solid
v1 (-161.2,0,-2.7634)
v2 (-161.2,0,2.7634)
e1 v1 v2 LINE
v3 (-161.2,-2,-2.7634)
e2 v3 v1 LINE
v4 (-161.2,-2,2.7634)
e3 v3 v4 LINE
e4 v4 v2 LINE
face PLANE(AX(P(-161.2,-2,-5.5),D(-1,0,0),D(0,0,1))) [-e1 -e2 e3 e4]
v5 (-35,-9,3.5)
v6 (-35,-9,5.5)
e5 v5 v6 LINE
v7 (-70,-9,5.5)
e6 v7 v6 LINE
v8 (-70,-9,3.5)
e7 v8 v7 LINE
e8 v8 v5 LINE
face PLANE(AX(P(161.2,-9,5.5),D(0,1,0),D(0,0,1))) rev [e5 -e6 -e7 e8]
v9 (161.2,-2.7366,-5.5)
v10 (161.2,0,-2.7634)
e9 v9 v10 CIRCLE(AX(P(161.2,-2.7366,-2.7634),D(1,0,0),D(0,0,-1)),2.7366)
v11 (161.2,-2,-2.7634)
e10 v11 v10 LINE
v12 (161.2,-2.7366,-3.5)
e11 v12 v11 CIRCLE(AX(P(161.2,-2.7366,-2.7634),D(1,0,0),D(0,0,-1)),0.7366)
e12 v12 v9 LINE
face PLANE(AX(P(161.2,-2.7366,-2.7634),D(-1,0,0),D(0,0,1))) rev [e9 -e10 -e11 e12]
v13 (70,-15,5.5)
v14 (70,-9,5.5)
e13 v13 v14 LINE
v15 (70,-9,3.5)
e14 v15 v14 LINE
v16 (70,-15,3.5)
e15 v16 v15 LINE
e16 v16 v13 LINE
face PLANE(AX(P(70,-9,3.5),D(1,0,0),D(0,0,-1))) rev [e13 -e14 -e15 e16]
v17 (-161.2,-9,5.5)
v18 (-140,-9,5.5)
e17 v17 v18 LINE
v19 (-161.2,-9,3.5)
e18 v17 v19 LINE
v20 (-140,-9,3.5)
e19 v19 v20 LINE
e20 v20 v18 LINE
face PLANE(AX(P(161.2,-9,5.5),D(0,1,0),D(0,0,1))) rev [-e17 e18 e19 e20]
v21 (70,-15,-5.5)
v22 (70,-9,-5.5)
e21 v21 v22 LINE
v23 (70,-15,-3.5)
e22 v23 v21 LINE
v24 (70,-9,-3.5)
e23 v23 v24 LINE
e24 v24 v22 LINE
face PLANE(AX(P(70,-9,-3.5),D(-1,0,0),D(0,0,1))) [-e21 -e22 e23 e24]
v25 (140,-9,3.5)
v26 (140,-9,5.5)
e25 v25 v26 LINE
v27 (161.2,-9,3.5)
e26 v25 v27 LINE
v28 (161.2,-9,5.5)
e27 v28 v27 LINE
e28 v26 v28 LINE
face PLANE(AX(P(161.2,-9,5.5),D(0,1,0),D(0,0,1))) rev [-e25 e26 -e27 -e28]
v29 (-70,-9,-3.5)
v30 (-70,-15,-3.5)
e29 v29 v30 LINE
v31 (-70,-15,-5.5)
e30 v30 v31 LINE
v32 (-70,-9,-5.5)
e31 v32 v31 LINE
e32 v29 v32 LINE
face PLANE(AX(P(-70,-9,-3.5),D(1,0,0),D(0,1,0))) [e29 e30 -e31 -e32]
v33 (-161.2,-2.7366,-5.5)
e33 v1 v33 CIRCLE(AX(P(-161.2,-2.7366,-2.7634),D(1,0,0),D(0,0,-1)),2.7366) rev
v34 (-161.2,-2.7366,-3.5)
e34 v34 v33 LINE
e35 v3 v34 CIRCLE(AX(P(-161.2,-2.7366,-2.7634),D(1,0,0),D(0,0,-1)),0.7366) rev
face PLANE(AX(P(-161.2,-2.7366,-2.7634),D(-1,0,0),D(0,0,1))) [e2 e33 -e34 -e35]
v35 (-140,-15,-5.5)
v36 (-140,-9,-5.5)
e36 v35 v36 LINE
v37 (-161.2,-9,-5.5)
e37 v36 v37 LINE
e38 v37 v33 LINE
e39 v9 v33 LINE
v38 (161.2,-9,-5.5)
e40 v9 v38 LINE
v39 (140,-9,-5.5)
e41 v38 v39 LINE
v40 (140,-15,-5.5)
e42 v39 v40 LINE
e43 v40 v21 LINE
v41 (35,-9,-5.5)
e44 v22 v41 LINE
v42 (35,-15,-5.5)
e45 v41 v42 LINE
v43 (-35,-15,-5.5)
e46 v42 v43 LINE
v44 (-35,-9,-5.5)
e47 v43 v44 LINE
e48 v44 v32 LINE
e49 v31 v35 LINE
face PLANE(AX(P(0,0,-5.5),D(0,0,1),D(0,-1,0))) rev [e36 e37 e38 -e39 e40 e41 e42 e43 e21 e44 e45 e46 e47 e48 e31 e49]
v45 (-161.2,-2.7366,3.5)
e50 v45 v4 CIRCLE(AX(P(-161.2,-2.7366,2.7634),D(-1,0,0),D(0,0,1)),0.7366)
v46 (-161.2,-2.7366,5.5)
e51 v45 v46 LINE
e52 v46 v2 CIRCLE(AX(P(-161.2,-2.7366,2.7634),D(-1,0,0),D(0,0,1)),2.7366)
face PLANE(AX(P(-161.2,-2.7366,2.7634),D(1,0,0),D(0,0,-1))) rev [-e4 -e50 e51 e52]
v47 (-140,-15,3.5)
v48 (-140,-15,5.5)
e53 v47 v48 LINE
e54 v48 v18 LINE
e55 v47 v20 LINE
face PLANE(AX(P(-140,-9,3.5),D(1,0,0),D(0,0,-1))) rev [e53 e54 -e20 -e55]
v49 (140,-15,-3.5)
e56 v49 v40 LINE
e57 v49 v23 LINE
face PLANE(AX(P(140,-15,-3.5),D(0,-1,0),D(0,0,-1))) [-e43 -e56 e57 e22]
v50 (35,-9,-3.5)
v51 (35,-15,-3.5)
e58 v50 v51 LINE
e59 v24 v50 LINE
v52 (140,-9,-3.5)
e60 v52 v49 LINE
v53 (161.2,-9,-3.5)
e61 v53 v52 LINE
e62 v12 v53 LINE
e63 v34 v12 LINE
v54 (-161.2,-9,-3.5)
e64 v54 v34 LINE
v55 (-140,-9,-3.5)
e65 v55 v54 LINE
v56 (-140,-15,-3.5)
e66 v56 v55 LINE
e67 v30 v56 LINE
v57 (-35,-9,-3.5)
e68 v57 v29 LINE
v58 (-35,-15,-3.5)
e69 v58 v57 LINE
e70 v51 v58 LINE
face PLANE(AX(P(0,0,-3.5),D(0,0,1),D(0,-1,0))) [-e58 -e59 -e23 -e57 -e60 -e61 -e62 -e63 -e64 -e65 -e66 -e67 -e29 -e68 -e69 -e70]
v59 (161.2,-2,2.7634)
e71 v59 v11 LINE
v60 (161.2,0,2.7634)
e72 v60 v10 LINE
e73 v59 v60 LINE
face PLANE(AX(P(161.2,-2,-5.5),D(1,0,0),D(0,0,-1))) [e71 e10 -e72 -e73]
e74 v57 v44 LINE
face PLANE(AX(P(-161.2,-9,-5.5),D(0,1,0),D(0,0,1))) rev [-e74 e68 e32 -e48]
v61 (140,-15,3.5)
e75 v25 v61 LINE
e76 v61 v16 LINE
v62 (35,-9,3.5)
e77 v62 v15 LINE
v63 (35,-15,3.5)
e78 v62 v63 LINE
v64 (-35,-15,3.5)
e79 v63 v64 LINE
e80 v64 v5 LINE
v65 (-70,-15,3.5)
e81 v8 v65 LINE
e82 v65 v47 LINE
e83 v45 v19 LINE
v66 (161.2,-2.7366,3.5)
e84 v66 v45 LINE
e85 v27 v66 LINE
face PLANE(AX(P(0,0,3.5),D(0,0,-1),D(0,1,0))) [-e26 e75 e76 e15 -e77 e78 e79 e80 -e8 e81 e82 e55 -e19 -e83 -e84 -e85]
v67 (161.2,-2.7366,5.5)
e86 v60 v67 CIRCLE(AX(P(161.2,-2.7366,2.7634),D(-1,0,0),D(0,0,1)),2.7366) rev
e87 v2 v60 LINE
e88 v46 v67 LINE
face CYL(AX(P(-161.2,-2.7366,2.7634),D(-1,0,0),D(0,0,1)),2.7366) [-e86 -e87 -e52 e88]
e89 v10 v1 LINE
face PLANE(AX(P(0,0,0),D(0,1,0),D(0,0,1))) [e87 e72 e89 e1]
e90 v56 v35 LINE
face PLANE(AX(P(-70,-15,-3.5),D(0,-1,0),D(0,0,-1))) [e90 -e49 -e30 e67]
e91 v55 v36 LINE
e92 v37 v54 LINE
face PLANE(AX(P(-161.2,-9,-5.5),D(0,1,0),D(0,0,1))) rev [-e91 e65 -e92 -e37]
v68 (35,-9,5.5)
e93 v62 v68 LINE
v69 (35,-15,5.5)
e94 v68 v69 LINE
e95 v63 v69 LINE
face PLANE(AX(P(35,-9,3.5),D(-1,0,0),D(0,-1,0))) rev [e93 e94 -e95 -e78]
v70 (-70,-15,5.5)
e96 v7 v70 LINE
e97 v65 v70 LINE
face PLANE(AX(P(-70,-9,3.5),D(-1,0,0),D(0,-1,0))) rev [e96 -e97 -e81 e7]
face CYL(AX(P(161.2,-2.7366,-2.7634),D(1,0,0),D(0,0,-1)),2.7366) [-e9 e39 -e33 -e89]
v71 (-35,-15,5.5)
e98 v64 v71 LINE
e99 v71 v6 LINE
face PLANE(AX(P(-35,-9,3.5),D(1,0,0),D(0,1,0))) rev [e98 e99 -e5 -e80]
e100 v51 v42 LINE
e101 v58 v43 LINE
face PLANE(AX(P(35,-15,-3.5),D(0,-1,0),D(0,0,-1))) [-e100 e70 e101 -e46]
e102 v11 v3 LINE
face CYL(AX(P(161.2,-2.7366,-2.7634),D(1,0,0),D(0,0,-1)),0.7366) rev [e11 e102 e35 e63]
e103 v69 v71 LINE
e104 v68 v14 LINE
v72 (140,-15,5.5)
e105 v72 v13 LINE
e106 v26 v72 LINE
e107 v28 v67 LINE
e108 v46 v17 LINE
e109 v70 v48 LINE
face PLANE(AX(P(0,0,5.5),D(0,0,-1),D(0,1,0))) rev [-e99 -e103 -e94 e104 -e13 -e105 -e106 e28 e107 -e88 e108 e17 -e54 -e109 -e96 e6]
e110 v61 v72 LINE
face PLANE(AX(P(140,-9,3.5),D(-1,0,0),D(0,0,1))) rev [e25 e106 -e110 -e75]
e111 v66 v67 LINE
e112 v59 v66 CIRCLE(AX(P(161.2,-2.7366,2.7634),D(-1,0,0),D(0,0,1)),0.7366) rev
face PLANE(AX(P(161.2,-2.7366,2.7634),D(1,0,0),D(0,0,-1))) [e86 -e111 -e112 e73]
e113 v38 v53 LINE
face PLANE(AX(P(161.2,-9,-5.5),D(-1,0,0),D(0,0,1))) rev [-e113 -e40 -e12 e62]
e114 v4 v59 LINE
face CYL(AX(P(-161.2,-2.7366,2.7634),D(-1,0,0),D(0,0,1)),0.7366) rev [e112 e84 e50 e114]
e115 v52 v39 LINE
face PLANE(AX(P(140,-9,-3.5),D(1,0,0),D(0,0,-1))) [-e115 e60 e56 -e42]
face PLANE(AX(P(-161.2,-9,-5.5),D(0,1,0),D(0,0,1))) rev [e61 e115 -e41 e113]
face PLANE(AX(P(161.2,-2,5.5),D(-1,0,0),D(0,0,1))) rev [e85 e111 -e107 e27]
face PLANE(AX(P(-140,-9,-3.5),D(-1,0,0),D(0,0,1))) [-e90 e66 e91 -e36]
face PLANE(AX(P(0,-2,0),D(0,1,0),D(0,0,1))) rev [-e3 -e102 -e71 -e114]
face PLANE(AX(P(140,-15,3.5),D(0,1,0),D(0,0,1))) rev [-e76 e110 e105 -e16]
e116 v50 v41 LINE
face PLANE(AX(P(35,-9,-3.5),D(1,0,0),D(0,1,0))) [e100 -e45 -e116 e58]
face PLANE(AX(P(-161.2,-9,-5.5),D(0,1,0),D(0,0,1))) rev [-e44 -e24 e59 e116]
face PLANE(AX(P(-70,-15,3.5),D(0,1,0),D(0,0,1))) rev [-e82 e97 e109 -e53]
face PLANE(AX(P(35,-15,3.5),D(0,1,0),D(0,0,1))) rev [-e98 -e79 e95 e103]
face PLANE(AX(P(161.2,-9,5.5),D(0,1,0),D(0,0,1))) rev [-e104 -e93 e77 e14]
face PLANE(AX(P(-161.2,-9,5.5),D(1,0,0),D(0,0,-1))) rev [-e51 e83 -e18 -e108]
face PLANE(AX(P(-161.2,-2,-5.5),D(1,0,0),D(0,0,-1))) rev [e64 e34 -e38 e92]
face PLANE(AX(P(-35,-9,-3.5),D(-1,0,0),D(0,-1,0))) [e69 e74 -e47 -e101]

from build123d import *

# Parameters (mm, degrees)
SKETCH2_W                      = 322.4
SKETCH2_H                      = 11
BASE_FLANGE1_DEPTH             = 2
EDGE_FLANGE1_STRIP_W           = 9.4732
EDGE_FLANGE1_STRIP_H           = 2
EDGE_FLANGE1_STRIP_CUT_DEPTH   = 322.4
EDGE_FLANGE1_STRIP_2_W         = 9.4732
EDGE_FLANGE1_STRIP_2_H         = 2
EDGE_FLANGE1_STRIP_CUT_2_DEPTH = 322.4
EDGE_FLANGE1_DEPTH             = 322.4
EDGE_FLANGE1_BEND_DEPTH        = 322.4
SKETCH15_W                     = 70
SKETCH15_H                     = 6
TAB1_DEPTH                     = 2


# Sheet-metal steps are written as plain solids
with BuildPart() as part:
    # Sketch2 → Base-Flange1 (new body)
    with BuildSketch(Plane(origin=(0, 0, 0), x_dir=(1, 0, 0), z_dir=(0, 1, 0))):
        Rectangle(SKETCH2_W, SKETCH2_H)
    extrude(amount=-BASE_FLANGE1_DEPTH)

    # Edge-Flange1 strip (across the edge) → Edge-Flange1 strip cut (cut)
    with BuildSketch(Plane(origin=(161.2, -2, 5.5), x_dir=(0, 0, -1), z_dir=(-1, 0, 0))):
        with Locations((-2, -1)):
            Rectangle(EDGE_FLANGE1_STRIP_W, EDGE_FLANGE1_STRIP_H)
    extrude(amount=EDGE_FLANGE1_STRIP_CUT_DEPTH, mode=Mode.SUBTRACT)

    # Edge-Flange1 strip 2 (across the edge) → Edge-Flange1 strip cut 2 (cut)
    with BuildSketch(Plane(origin=(-161.2, -2, -5.5), x_dir=(0, 0, 1), z_dir=(1, 0, 0))):
        with Locations((-2, -1)):
            Rectangle(EDGE_FLANGE1_STRIP_2_W, EDGE_FLANGE1_STRIP_2_H)
    extrude(amount=EDGE_FLANGE1_STRIP_CUT_2_DEPTH, mode=Mode.SUBTRACT)

    # Edge-Flange1 section (across the edge) → Edge-Flange1 (add)
    with BuildSketch(Plane(origin=(161.2, -2, 5.5), x_dir=(0, 0, -1), z_dir=(-1, 0, 0))):
        with BuildLine():
            Line((0, 0.7366), (0, 7))
            Line((0, 7), (2, 7))
            Line((2, 7), (2, 0.7366))
            ThreePointArc((2, 0.7366), (2.215745145, 0.215745145), (2.7366, 0))
            Line((2.7366, 0), (2.7366, -2))
            ThreePointArc((2.7366, -2), (0.801531583, -1.198468417), (0, 0.7366))
        make_face()
    extrude(amount=EDGE_FLANGE1_DEPTH)

    # Edge-Flange1 section 2 (across the edge) → Edge-Flange1 bend (add)
    with BuildSketch(Plane(origin=(-161.2, -2, -5.5), x_dir=(0, 0, 1), z_dir=(1, 0, 0))):
        with BuildLine():
            Line((0, 0.7366), (0, 7))
            Line((0, 7), (2, 7))
            Line((2, 7), (2, 0.7366))
            ThreePointArc((2, 0.7366), (2.215745145, 0.215745145), (2.7366, 0))
            Line((2.7366, 0), (2.7366, -2))
            ThreePointArc((2.7366, -2), (0.801531583, -1.198468417), (0, 0.7366))
        make_face()
    extrude(amount=EDGE_FLANGE1_BEND_DEPTH)

    # Sketch15 → Tab1 (add)
    with BuildSketch(Plane(origin=(0, 0, -5.5), x_dir=(-1, 0, 0), z_dir=(0, 0, -1))):
        with Locations((-105, -12)):
            Rectangle(SKETCH15_W, SKETCH15_H)
        with Locations((0, -12)):
            Rectangle(SKETCH15_W, SKETCH15_H)
        with Locations((105, -12)):
            Rectangle(SKETCH15_W, SKETCH15_H)
    tab1 = extrude(amount=-TAB1_DEPTH)

    # Mirror1: Tab1 across plane
    add(tab1.mirror(Plane.XY))


solid = part.part
